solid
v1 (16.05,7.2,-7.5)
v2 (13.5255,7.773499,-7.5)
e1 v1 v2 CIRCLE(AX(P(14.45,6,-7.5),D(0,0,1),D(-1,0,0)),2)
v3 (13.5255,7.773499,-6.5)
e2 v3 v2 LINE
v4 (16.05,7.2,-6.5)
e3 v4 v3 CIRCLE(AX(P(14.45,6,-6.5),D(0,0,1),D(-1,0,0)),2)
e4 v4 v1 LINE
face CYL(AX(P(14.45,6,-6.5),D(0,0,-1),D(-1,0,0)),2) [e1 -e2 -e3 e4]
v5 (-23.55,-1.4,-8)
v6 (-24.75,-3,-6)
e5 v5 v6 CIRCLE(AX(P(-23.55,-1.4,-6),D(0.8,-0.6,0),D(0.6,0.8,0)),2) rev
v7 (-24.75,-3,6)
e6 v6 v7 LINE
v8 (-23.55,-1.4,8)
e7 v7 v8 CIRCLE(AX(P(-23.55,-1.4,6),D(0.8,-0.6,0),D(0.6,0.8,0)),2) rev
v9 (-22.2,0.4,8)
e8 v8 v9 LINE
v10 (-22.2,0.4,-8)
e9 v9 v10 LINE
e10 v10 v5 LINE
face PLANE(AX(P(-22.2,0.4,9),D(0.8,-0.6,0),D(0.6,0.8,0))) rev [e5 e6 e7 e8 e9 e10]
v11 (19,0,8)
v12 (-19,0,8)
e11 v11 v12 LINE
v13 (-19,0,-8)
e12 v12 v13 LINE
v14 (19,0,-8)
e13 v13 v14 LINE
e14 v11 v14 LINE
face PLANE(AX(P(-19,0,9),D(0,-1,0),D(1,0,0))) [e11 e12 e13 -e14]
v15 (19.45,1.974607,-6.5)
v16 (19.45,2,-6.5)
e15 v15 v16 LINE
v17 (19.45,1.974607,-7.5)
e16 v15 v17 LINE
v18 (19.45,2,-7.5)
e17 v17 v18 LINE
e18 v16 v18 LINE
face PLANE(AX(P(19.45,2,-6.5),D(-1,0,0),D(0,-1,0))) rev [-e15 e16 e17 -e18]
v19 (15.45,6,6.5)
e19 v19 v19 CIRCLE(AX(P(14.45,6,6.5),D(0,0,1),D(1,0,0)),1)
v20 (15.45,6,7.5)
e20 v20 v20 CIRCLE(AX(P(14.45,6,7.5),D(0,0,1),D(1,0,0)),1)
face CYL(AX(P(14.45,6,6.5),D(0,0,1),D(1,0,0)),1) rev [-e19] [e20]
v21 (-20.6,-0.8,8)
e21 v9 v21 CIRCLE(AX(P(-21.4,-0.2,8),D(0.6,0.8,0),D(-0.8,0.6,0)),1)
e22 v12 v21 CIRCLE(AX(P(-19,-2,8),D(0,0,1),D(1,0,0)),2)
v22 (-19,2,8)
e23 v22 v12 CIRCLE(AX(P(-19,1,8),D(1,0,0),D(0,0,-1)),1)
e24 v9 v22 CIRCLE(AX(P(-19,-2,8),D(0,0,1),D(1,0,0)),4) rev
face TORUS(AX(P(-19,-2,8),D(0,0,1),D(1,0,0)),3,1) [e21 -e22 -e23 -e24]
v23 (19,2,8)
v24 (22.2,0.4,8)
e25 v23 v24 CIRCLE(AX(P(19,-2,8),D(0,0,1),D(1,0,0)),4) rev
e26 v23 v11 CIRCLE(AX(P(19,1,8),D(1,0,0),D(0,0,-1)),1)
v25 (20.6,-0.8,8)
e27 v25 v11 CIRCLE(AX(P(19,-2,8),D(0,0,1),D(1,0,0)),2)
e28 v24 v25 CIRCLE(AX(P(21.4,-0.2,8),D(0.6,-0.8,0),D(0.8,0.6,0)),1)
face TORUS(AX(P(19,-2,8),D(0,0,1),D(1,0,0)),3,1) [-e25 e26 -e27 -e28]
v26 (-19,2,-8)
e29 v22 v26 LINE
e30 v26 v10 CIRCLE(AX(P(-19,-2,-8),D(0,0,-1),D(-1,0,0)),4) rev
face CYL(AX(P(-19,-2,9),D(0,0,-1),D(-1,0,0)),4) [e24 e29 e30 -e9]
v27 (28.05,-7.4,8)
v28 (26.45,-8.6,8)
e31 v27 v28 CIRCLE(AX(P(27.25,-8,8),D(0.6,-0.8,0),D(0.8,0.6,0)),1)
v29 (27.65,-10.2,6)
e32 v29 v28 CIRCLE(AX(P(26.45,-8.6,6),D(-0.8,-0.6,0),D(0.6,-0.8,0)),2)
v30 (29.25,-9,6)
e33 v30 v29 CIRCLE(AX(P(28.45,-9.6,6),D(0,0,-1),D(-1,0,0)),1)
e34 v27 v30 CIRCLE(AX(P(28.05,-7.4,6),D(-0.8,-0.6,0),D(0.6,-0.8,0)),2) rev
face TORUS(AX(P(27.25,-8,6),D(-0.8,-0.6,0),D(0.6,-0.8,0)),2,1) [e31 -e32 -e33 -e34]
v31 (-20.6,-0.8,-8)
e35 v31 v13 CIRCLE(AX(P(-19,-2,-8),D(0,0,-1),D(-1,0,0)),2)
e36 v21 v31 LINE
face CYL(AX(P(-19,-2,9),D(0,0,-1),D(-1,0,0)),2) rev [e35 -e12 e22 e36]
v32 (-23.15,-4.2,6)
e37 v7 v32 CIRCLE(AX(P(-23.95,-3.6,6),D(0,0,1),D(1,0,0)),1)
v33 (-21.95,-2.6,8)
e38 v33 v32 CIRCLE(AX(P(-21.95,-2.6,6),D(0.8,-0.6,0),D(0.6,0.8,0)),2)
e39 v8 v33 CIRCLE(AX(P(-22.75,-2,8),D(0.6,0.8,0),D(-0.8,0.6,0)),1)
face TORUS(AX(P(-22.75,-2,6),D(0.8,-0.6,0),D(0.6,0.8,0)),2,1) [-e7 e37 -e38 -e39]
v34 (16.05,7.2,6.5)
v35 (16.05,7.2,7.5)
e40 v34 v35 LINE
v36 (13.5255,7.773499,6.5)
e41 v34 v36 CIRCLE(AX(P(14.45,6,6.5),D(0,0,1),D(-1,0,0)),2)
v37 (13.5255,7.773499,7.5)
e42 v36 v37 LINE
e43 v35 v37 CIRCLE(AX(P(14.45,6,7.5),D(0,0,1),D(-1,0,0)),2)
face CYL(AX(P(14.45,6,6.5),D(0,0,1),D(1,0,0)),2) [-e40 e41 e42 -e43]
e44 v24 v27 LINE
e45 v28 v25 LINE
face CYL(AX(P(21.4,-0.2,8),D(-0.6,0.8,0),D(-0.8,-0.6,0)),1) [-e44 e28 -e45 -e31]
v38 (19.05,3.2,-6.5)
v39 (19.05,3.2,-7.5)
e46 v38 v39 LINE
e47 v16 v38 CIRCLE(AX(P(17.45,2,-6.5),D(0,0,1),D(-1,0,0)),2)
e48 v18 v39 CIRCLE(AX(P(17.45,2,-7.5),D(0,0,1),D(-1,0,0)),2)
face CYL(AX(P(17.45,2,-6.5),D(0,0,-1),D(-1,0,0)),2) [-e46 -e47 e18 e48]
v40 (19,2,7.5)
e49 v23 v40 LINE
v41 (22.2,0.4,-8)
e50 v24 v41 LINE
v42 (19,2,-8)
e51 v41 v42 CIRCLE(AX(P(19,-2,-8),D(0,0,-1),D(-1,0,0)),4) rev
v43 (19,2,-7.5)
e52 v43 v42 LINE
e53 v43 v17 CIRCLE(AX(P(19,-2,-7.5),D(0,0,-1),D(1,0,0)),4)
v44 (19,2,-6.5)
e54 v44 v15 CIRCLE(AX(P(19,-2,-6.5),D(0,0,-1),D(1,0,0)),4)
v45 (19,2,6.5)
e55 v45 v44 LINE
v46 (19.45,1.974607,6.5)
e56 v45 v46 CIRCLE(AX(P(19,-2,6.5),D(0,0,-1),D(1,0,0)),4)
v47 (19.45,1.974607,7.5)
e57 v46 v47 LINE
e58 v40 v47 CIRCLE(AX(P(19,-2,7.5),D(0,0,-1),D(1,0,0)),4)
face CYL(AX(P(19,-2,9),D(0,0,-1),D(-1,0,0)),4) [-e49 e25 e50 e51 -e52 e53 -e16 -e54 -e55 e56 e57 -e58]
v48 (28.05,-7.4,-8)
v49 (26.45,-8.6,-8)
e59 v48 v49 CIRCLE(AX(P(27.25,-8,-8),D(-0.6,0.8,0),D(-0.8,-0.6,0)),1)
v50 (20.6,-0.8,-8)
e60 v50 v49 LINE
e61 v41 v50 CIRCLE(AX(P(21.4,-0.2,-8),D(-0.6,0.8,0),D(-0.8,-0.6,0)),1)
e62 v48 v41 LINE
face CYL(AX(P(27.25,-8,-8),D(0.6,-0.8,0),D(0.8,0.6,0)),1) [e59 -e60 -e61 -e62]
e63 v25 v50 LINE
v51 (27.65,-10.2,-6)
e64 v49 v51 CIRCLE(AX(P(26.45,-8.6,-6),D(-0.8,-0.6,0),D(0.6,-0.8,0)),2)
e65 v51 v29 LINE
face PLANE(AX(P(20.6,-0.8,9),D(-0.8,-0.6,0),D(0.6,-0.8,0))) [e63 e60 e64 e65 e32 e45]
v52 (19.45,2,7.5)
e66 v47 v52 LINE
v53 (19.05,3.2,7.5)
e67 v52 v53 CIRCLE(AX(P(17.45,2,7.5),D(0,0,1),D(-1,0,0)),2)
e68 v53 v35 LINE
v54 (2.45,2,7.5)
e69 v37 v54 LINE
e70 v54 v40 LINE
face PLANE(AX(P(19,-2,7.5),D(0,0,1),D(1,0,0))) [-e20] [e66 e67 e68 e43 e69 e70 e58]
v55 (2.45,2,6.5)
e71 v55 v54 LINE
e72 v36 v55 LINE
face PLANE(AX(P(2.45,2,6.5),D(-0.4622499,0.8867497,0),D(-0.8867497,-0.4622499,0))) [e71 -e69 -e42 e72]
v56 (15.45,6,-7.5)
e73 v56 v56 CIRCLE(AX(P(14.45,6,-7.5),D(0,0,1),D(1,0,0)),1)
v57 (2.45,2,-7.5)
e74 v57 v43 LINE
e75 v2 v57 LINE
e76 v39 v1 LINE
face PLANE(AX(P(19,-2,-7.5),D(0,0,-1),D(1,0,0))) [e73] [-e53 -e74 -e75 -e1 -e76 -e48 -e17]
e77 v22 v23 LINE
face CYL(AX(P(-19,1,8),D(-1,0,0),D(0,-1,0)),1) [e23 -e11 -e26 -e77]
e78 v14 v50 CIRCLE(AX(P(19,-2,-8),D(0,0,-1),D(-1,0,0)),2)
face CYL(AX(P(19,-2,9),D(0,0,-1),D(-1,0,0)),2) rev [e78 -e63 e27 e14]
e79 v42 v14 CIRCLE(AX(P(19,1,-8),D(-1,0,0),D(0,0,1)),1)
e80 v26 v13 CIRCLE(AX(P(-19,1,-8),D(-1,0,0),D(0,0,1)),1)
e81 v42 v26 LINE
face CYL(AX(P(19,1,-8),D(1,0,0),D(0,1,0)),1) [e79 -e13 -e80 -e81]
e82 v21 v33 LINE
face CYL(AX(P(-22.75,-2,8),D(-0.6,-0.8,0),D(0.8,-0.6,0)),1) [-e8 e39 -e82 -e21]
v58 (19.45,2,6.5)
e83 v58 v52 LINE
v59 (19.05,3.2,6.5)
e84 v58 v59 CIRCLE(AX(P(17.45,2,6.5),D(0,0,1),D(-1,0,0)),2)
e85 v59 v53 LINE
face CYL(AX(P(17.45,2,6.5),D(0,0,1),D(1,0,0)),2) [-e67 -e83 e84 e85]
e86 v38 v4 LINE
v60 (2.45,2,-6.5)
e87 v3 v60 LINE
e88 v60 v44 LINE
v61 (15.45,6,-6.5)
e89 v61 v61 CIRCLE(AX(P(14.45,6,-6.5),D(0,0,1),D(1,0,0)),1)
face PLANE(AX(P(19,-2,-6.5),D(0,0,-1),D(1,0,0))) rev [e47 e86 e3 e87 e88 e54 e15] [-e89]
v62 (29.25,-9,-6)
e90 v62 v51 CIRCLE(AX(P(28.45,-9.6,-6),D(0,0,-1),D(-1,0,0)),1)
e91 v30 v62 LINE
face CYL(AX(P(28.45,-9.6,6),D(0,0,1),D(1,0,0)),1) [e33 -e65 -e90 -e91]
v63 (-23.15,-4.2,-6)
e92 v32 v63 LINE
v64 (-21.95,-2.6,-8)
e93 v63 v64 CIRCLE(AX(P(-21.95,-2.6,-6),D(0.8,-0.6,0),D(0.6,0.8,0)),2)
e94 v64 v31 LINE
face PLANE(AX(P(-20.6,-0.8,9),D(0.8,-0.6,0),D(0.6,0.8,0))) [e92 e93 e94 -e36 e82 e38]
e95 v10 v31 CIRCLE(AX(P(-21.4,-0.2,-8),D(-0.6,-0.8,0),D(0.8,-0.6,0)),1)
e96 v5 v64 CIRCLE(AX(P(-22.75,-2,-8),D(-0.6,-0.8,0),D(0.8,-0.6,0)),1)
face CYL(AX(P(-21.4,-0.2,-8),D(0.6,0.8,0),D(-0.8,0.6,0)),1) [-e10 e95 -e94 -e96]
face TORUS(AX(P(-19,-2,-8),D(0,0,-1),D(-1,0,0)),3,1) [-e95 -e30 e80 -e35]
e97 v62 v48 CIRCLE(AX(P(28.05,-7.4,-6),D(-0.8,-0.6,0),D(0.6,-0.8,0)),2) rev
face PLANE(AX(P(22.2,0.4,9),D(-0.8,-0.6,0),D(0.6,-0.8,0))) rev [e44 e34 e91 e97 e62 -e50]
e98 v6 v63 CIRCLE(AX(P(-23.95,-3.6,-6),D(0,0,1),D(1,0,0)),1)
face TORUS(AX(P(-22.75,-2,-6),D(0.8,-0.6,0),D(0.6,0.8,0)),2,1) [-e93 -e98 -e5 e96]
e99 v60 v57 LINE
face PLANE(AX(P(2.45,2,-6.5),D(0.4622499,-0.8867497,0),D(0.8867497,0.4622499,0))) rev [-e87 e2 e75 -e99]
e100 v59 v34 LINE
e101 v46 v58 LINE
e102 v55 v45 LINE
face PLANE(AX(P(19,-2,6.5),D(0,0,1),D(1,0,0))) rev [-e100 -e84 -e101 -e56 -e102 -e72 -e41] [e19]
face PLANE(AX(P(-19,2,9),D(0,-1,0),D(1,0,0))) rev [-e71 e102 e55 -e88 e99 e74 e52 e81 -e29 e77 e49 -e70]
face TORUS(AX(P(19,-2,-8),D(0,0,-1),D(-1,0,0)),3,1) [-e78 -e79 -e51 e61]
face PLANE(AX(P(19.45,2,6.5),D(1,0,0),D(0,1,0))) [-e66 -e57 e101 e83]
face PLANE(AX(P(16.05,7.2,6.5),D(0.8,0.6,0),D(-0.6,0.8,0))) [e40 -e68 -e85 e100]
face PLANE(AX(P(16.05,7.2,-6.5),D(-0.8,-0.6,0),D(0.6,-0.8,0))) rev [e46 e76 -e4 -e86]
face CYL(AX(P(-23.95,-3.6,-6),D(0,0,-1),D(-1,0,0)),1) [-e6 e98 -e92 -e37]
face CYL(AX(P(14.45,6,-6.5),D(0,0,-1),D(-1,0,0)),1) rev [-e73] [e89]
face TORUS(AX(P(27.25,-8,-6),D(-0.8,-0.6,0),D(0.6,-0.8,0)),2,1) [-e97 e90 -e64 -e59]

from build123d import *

# Parameters (mm, degrees)
EXTRUDE_THIN1_DEPTH = 9
FILLET1_R           = 3
FILLET2_R           = 1
SKETCH2_R           = 1
EXTRUDE1_DEPTH      = 1


with BuildPart() as part:
    # Sketch1 → Extrude-Thin1 (new, symmetric)
    with BuildSketch(Plane.XY):
        with BuildLine():
            Line((-23.75, -5), (-20.6, -0.8))
            ThreePointArc((-20.6, -0.8), (-19.894427191, -0.211145618), (-19, 0))
            Line((-19, 0), (19, 0))
            ThreePointArc((19, 0), (19.894427191, -0.211145618), (20.6, -0.8))
            Line((20.6, -0.8), (28.25, -11))
            Line((28.25, -11), (29.85, -9.8))
            Line((29.85, -9.8), (22.2, 0.4))
            ThreePointArc((22.2, 0.4), (20.788854382, 1.577708764), (19, 2))
            Line((19, 2), (-19, 2))
            ThreePointArc((-19, 2), (-20.788854382, 1.577708764), (-22.2, 0.4))
            Line((-22.2, 0.4), (-25.35, -3.8))
            Line((-25.35, -3.8), (-23.75, -5))
        make_face()
    extrude(amount=EXTRUDE_THIN1_DEPTH, both=True)

    # Fillet1
    fillet1_edges = [part.edges().sort_by_distance(p)[0] for p in [
        (29.05, -10.4, -9),
        (-24.55, -4.4, -9),
        (29.05, -10.4, 9),
        (-24.55, -4.4, 9),
    ]]
    fillet(fillet1_edges, radius=FILLET1_R)

    # Fillet2
    fillet2_edges = [part.edges().sort_by_distance(p)[0] for p in [
        (-21.275, -1.7, 9),
        (20.788854382, 1.577708764, -9),
        (0, 0, -9),
        (-20.788854382, 1.577708764, -9),
        (-21.275, -1.7, -9),
        (-22.875, -0.5, -9),
        (-20.788854382, 1.577708764, 9),
        (0, 0, 9),
        (20.788854382, 1.577708764, 9),
        (-23.75, -5, 0),
        (-25.35, -3.8, 0),
        (-24.822792206, -3.097056275, -8.121320344),
        (-24.822792206, -3.097056275, 8.121320344),
        (0, 2, 9),
        (23.525, -4.7, 9),
        (25.125, -3.5, 9),
        (25.125, -3.5, -9),
        (23.525, -4.7, -9),
        (28.25, -11, 0),
        (27.722792206, -10.297056275, 8.121320344),
        (-22.875, -0.5, 9),
        (27.722792206, -10.297056275, -8.121320344),
        (29.85, -9.8, 0),
        (0, 2, -9),
    ]]
    fillet(fillet2_edges, radius=FILLET2_R - 0.0001)  # a hair under: the kernel refuses the full size

    # Sketch2 → Extrude1 (add)
    with BuildSketch(Plane.XY.offset(7.5)):
        with BuildLine():
            Line((2.45, 2), (13.5255002, 7.7734994))
            ThreePointArc((13.5255002, 7.7734994), (14.893058146, 7.950307535), (16.05, 7.2))
            Line((16.05, 7.2), (19.05, 3.2))
            ThreePointArc((19.05, 3.2), (19.347366596, 2.632455532), (19.45, 2))
            Line((19.45, 2), (19.45, 1.974606899))
            ThreePointArc((19.45, 1.974606899), (19.225357943, 1.993646679), (19, 2))
            Line((19, 2), (2.45, 2))
        make_face()
        with Locations((14.45, 6)):
            Circle(SKETCH2_R, mode=Mode.SUBTRACT)
    extrude1 = extrude(amount=-EXTRUDE1_DEPTH)

    # Mirror1: Extrude1 across plane
    add(extrude1.mirror(Plane.XY))


solid = part.part
